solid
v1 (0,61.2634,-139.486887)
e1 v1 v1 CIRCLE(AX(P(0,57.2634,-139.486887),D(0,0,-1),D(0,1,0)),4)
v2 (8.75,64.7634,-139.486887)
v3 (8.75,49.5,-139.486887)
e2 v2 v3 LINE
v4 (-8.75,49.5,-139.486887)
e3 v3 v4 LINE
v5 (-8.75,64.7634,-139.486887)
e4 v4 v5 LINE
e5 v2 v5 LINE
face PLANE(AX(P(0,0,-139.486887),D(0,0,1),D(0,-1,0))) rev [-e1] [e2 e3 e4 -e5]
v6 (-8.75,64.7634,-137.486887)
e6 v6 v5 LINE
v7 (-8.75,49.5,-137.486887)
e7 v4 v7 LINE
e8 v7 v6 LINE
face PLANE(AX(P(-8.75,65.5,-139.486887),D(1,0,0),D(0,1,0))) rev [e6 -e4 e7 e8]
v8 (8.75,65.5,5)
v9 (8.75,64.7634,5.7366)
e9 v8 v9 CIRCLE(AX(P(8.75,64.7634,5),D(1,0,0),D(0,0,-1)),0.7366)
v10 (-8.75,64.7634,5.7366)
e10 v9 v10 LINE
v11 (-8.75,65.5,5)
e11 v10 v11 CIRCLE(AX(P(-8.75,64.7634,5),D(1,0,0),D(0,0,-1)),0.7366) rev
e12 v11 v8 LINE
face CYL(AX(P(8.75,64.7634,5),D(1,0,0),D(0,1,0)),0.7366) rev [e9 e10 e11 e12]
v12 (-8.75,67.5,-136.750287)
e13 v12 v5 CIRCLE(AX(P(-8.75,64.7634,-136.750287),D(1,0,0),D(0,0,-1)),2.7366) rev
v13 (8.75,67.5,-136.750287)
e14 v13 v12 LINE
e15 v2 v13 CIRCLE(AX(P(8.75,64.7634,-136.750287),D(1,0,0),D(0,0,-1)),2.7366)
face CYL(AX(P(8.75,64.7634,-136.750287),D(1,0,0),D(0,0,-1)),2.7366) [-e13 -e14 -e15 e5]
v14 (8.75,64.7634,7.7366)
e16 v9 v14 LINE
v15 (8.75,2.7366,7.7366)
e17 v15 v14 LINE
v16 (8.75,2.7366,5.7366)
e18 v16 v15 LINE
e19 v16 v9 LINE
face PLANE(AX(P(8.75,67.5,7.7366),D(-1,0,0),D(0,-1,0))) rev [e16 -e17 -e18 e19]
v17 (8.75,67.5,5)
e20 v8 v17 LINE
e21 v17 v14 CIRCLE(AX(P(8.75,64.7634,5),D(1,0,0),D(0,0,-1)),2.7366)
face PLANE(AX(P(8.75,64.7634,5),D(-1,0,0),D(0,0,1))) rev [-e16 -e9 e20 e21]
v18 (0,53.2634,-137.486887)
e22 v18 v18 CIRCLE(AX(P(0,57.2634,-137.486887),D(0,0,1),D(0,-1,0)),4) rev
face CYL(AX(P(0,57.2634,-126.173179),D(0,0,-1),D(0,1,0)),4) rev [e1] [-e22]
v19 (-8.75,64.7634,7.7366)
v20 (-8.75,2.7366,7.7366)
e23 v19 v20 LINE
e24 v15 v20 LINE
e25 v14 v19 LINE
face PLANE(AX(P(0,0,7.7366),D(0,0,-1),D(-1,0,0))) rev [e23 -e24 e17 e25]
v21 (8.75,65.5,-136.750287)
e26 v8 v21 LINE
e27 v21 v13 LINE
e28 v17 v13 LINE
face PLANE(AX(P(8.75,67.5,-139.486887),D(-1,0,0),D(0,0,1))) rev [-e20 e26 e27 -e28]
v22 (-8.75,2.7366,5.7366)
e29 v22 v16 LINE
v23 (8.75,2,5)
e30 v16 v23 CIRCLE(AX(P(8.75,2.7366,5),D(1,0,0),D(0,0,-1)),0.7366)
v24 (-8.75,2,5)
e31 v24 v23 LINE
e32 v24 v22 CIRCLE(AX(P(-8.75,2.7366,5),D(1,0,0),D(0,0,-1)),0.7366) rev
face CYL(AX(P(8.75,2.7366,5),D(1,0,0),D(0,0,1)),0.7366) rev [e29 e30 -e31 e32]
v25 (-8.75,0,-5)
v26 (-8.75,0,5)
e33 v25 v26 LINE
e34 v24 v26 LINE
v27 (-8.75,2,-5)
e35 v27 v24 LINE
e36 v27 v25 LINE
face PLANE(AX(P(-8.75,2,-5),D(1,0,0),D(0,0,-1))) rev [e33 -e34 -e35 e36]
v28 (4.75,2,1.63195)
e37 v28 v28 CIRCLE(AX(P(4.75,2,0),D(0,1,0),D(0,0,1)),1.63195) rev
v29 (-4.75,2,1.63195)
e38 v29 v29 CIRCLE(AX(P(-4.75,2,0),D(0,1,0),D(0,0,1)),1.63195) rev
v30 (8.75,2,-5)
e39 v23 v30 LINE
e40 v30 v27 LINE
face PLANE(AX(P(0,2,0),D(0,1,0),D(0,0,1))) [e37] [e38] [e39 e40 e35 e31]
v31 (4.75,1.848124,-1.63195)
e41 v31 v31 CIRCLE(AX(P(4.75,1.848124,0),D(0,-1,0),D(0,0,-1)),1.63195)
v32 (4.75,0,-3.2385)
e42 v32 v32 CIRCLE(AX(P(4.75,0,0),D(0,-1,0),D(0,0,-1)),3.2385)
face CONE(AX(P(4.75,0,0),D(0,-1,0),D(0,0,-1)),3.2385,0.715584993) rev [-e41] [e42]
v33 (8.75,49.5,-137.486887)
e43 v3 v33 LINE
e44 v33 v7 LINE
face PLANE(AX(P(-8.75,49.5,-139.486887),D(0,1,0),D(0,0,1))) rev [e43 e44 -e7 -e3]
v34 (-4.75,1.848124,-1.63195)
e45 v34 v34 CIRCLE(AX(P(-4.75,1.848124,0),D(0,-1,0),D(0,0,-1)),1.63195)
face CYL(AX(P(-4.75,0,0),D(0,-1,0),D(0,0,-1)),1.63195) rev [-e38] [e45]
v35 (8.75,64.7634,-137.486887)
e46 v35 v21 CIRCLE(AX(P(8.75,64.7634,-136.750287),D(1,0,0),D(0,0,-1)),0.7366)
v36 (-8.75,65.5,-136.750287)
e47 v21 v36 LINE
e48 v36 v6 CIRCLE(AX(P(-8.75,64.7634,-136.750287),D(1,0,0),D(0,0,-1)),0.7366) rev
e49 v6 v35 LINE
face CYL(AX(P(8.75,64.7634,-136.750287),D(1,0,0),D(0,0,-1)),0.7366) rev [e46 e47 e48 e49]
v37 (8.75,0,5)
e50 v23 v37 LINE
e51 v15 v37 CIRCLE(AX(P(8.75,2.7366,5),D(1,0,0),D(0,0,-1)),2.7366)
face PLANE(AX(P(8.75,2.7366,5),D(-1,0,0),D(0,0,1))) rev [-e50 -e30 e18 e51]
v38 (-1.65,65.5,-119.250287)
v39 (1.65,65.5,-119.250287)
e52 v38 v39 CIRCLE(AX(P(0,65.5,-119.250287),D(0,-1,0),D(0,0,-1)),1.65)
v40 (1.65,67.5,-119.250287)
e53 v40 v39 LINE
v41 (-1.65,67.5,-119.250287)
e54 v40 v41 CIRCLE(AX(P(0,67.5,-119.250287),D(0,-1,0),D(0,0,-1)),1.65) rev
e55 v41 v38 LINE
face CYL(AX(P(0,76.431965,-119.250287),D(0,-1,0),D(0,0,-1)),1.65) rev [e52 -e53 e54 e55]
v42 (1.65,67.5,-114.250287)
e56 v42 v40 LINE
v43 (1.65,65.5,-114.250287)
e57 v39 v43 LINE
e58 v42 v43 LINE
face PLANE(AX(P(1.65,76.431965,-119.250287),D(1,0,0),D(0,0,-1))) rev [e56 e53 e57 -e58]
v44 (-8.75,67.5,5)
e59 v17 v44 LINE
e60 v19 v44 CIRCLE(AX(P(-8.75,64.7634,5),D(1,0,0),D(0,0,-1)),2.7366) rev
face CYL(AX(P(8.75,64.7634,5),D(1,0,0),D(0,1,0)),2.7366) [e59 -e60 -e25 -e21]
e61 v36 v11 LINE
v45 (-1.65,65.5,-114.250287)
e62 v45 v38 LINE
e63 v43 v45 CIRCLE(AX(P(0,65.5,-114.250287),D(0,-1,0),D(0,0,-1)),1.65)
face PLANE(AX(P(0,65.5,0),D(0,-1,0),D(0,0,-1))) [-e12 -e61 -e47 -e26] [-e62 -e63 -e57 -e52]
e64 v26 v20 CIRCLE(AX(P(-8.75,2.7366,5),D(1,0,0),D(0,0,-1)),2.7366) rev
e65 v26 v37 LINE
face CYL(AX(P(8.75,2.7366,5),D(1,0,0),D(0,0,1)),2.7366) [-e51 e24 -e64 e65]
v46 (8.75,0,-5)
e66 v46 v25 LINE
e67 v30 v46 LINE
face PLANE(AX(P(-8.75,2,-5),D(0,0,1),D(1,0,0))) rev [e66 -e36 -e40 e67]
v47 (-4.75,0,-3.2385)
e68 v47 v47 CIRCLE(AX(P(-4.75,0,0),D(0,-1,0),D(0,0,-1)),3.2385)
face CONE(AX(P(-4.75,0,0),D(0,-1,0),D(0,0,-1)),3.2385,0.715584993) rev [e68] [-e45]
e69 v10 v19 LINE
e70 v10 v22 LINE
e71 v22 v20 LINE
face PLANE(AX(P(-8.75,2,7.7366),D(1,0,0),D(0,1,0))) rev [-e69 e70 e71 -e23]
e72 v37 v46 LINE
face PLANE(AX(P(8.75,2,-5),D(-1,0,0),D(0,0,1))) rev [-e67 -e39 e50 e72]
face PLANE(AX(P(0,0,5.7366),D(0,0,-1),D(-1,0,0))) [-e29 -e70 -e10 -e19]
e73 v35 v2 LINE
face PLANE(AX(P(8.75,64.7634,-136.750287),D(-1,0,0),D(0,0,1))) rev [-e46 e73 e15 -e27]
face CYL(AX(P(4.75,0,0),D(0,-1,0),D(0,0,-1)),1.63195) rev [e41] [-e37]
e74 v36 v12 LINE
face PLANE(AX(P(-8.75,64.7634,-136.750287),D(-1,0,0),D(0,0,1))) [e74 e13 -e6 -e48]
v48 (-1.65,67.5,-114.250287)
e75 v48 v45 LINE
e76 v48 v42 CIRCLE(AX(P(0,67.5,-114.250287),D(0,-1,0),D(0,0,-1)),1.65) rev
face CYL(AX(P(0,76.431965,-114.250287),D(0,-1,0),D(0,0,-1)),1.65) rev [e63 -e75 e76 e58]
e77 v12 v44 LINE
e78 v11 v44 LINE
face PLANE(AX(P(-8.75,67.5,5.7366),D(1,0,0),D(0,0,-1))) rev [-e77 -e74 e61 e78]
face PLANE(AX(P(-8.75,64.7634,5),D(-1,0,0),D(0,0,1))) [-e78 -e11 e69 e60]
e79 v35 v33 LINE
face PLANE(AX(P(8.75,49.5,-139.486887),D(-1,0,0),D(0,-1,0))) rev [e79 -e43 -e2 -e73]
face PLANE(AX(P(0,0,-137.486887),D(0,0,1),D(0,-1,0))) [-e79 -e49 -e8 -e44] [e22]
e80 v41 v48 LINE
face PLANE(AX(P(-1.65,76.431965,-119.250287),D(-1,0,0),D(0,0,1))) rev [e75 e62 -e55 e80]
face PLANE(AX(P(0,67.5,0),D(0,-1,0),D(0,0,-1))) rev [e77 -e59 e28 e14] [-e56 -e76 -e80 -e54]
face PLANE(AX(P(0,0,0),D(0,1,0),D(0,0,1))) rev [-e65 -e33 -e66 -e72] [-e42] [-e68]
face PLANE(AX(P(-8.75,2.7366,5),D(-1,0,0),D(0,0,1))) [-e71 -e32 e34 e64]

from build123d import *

# Parameters (mm, degrees)
SKETCH1_W                                     = 17.5
SKETCH1_H                                     = 10
BASE_FLANGE1_DEPTH                            = 2
EDGE_FLANGE1_DEPTH                            = 17.5
EDGE_FLANGE2_STRIP_W                          = 9.4732
EDGE_FLANGE2_STRIP_H                          = 2
EDGE_FLANGE2_STRIP_CUT_DEPTH                  = 17.5
EDGE_FLANGE2_DEPTH                            = 17.5
EDGE_FLANGE3_STRIP_W                          = 9.4732
EDGE_FLANGE3_STRIP_H                          = 2
EDGE_FLANGE3_STRIP_CUT_DEPTH                  = 17.5
EDGE_FLANGE3_DEPTH                            = 17.5
SKETCH18_R                                    = 4
CUT_EXTRUDE2_DEPTH                            = 2
CSK_FOR_4_FLAT_HEAD_SOCKET_CAP_SCREW1_A_COUNT = 2
CSK_FOR_4_FLAT_HEAD_SOCKET_CAP_SCREW1_A_PITCH = 9.5
CUT_EXTRUDE3_DEPTH                            = 2


# Sheet-metal steps are written as plain solids
with BuildPart() as part:
    # Sketch1 → Base-Flange1 (new body)
    with BuildSketch(Plane(origin=(0, 0, 0), x_dir=(1, 0, 0), z_dir=(0, 1, 0))):
        Rectangle(SKETCH1_W, SKETCH1_H)
    extrude(amount=BASE_FLANGE1_DEPTH)

    # Edge-Flange1 section (across the edge) → Edge-Flange1 (add)
    with BuildSketch(Plane(origin=(-8.75, 2, 5.7366), x_dir=(0, 0, -1), z_dir=(1, 0, 0))):
        with BuildLine():
            Line((-2, 0.7366), (-2, 65.5))
            Line((-2, 65.5), (0, 65.5))
            Line((0, 65.5), (0, 0.7366))
            ThreePointArc((0, 0.7366), (0.215745145, 0.215745145), (0.7366, 0))
            Line((0.7366, 0), (0.7366, -2))
            ThreePointArc((0.7366, -2), (-1.198468417, -1.198468417), (-2, 0.7366))
        make_face()
    extrude(amount=EDGE_FLANGE1_DEPTH)

    # Edge-Flange2 strip (across the edge) → Edge-Flange2 strip cut (cut)
    with BuildSketch(Plane(origin=(-8.75, 67.5, 5.7366), x_dir=(0, -1, 0), z_dir=(1, 0, 0))):
        with Locations((-2, -1)):
            Rectangle(EDGE_FLANGE2_STRIP_W, EDGE_FLANGE2_STRIP_H)
    extrude(amount=EDGE_FLANGE2_STRIP_CUT_DEPTH, mode=Mode.SUBTRACT)

    # Edge-Flange2 section (across the edge) → Edge-Flange2 (add)
    with BuildSketch(Plane(origin=(-8.75, 67.5, 5.7366), x_dir=(0, -1, 0), z_dir=(1, 0, 0))):
        with BuildLine():
            Line((0, 0.7366), (0, 145.22348749))
            Line((0, 145.22348749), (2, 145.22348749))
            Line((2, 145.22348749), (2, 0.7366))
            ThreePointArc((2, 0.7366), (2.215745145, 0.215745145), (2.7366, 0))
            Line((2.7366, 0), (2.7366, -2))
            ThreePointArc((2.7366, -2), (0.801531583, -1.198468417), (0, 0.7366))
        make_face()
    extrude(amount=EDGE_FLANGE2_DEPTH)

    # Edge-Flange3 strip (across the edge) → Edge-Flange3 strip cut (cut)
    with BuildSketch(Plane(origin=(-8.75, 65.5, -139.48688749), x_dir=(0, 0, 1), z_dir=(1, 0, 0))):
        with Locations((-2, -1)):
            Rectangle(EDGE_FLANGE3_STRIP_W, EDGE_FLANGE3_STRIP_H)
    extrude(amount=EDGE_FLANGE3_STRIP_CUT_DEPTH, mode=Mode.SUBTRACT)

    # Edge-Flange3 section (across the edge) → Edge-Flange3 (add)
    with BuildSketch(Plane(origin=(-8.75, 65.5, -139.48688749), x_dir=(0, 0, 1), z_dir=(1, 0, 0))):
        with BuildLine():
            Line((0, 0.7366), (0, 16))
            Line((0, 16), (2, 16))
            Line((2, 16), (2, 0.7366))
            ThreePointArc((2, 0.7366), (2.215745145, 0.215745145), (2.7366, 0))
            Line((2.7366, 0), (2.7366, -2))
            ThreePointArc((2.7366, -2), (0.801531583, -1.198468417), (0, 0.7366))
        make_face()
    extrude(amount=EDGE_FLANGE3_DEPTH)

    # Sketch18 → Cut-Extrude2 (cut)
    with BuildSketch(Plane(origin=(0, 0, -139.48688749), x_dir=(-1, 0, 0), z_dir=(0, 0, -1))):
        with Locations(Location((0, 57.2634, 0), (0, 0, 90))):
            Circle(SKETCH18_R)
    extrude(amount=-CUT_EXTRUDE2_DEPTH, mode=Mode.SUBTRACT)

    # Sketch20 → CSK for #4 Flat Head Socket Cap Screw1 (revolve, cut)
    with BuildSketch(Plane(origin=(4.75, 0, 0), x_dir=(0, 0, -1), z_dir=(1, 0, 0))):
        Polygon((0, 0), (0, 2.980574487), (1.63195, 2), (1.63195, 1.848124365), (3.2385, 0), align=None)
    csk_for_4_flat_head_socket_cap_screw1 = revolve(axis=Axis((4.75, -6.35, 0), (0, 1, 0)), mode=Mode.SUBTRACT)

    # CSK for #4 Flat Head Socket Cap Screw1 a: CSK for #4 Flat Head Socket Cap Screw1 ×2
    with Locations(*[(-i * CSK_FOR_4_FLAT_HEAD_SOCKET_CAP_SCREW1_A_PITCH, 0, 0) for i in range(1, CSK_FOR_4_FLAT_HEAD_SOCKET_CAP_SCREW1_A_COUNT)]):
        add(csk_for_4_flat_head_socket_cap_screw1, mode=Mode.SUBTRACT)

    # Sketch23 → Cut-Extrude3 (cut)
    with BuildSketch(Plane.XZ.offset(-65.5)):
        with BuildLine():
            Line((-1.65, -119.25028749), (-1.65, -114.25028749))
            ThreePointArc((-1.65, -114.25028749), (0, -112.60028749), (1.65, -114.25028749))
            Line((1.65, -114.25028749), (1.65, -119.25028749))
            ThreePointArc((1.65, -119.25028749), (0, -120.90028749), (-1.65, -119.25028749))
        make_face()
    extrude(amount=-CUT_EXTRUDE3_DEPTH, mode=Mode.SUBTRACT)


solid = part.part
